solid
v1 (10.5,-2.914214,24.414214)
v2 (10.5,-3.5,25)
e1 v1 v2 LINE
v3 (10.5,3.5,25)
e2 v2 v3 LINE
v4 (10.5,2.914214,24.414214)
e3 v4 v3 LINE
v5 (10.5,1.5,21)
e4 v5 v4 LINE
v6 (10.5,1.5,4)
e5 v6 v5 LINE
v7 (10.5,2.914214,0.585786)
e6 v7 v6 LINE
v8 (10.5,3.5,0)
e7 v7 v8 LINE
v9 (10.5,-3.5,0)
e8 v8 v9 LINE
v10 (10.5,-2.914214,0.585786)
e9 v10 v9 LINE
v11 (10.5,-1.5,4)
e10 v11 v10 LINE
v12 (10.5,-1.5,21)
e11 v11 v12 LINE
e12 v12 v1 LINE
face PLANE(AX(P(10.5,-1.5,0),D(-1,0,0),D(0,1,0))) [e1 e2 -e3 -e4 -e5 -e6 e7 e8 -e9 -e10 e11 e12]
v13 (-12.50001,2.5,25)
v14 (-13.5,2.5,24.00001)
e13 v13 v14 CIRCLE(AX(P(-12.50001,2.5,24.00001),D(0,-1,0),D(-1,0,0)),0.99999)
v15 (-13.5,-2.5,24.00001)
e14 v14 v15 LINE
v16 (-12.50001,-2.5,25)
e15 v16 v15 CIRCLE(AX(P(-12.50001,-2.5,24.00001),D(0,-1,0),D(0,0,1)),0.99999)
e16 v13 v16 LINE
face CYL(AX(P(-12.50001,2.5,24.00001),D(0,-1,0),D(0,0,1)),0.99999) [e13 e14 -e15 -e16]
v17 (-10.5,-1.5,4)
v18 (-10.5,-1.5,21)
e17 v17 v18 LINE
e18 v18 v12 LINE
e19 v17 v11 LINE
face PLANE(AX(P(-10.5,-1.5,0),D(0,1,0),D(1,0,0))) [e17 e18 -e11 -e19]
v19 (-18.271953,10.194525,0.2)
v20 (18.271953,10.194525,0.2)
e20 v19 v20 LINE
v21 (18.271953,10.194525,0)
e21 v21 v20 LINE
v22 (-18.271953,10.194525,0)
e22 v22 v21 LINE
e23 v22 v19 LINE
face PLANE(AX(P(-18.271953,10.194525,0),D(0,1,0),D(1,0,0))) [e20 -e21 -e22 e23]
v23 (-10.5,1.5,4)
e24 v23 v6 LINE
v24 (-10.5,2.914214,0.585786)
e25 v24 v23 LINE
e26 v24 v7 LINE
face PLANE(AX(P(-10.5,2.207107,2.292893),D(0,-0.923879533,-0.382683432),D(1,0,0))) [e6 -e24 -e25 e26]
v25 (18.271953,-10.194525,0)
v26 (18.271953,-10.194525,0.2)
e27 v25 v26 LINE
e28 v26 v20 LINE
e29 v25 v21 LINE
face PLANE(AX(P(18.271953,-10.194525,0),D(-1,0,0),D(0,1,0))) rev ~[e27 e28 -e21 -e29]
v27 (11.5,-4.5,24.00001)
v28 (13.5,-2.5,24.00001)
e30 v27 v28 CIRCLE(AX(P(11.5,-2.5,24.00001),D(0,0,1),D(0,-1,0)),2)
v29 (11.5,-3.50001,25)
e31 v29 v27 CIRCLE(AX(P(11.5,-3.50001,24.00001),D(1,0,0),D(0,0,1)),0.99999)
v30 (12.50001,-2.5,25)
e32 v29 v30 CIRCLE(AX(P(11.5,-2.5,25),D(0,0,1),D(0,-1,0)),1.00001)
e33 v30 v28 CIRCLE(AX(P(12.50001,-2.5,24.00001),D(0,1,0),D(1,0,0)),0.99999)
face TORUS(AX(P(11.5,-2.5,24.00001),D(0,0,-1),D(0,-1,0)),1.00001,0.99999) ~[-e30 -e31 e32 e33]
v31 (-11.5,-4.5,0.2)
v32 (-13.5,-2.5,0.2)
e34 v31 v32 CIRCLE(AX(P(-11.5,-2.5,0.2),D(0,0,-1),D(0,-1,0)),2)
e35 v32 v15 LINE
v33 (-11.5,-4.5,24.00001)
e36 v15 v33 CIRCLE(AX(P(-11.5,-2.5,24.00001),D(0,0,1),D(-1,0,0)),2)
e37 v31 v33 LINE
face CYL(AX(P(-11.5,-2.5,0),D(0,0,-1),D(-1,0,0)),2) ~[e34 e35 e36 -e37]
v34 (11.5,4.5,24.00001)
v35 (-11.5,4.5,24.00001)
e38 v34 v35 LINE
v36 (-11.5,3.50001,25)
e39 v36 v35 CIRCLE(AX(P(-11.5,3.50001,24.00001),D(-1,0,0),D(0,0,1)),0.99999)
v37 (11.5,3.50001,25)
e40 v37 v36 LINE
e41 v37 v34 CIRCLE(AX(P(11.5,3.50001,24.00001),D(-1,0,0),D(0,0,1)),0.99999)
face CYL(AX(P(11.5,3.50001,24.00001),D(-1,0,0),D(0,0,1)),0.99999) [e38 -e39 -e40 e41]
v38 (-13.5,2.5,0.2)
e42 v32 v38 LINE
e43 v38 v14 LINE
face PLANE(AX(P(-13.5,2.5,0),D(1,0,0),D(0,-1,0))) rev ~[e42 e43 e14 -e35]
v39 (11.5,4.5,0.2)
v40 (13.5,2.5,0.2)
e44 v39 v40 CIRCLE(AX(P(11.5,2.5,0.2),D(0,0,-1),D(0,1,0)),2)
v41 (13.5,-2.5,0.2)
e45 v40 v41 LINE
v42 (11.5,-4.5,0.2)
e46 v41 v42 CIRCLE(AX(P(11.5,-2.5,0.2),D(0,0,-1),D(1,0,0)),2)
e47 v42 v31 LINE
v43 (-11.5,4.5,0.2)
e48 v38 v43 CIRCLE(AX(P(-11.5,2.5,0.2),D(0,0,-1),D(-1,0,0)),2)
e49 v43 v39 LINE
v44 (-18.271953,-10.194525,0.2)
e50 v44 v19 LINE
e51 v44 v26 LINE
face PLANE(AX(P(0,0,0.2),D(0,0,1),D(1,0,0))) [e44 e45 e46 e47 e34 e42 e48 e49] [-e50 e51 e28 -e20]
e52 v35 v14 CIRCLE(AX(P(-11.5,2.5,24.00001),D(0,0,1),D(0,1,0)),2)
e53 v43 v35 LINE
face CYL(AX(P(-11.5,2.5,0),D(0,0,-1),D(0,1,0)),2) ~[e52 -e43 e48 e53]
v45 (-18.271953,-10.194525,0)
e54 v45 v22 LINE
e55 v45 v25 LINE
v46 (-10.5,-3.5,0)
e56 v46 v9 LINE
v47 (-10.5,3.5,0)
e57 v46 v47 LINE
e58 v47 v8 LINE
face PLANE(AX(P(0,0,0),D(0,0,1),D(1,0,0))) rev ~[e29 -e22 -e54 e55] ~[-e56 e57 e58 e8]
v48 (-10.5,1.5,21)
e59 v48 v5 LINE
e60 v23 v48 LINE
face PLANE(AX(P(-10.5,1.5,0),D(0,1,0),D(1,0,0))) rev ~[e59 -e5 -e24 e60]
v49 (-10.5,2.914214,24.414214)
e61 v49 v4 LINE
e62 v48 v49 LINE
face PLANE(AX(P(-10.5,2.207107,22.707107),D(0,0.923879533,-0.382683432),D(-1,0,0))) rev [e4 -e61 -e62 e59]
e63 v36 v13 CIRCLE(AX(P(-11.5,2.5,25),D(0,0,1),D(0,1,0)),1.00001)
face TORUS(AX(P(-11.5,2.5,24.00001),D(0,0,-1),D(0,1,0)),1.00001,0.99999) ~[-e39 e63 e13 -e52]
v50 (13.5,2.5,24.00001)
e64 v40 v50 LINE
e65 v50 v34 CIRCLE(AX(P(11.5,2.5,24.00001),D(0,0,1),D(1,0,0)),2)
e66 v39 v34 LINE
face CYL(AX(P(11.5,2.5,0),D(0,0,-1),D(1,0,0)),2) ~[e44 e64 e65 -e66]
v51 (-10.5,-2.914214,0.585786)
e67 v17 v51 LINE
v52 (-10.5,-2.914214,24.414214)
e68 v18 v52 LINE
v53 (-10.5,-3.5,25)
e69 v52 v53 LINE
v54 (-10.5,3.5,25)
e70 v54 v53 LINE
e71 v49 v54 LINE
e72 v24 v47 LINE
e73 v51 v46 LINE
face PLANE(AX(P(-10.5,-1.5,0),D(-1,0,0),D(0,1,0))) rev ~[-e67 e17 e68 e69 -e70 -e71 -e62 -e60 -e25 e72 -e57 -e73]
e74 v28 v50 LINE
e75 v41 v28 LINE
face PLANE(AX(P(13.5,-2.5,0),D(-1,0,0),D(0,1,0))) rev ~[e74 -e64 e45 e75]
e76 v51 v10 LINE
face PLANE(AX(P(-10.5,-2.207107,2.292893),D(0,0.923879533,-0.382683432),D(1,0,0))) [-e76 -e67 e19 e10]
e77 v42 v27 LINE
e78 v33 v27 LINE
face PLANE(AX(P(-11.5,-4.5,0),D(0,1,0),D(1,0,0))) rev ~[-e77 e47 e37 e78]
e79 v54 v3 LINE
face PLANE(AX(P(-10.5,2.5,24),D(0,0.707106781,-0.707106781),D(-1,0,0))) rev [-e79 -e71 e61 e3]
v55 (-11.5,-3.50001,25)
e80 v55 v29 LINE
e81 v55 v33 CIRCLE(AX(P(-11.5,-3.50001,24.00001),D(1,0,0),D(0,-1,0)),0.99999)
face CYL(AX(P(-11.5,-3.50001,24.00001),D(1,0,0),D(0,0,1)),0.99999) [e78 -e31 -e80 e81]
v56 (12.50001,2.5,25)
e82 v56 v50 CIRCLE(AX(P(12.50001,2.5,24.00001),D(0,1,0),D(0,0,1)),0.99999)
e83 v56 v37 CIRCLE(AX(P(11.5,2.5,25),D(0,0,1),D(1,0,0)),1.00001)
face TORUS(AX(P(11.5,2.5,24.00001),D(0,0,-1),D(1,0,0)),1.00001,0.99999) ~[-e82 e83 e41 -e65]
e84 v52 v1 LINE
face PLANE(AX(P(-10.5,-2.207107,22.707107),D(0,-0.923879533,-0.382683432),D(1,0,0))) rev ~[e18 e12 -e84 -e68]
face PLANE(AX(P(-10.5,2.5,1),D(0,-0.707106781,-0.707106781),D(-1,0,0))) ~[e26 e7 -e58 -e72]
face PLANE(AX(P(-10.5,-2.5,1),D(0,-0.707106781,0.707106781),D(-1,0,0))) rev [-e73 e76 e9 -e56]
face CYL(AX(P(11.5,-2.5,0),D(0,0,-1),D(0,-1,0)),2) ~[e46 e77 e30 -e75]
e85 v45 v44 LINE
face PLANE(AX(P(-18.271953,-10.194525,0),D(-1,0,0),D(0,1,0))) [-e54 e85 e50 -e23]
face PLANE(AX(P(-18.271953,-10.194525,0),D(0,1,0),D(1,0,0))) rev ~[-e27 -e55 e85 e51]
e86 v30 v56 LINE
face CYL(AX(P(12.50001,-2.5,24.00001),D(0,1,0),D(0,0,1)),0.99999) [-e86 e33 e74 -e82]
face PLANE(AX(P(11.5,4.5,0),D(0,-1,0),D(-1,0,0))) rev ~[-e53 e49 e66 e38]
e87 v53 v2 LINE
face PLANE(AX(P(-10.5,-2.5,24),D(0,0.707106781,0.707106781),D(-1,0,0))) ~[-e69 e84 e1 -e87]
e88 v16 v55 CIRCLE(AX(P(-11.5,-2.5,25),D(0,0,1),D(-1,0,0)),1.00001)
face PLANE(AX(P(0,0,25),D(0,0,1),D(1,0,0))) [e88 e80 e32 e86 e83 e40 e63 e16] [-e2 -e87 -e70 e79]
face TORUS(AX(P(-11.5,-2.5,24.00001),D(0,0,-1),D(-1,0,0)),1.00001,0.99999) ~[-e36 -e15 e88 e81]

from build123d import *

# Parameters (mm, degrees)
F0_W     = 21
F0_H     = 3
F1_DEPTH = 25
F2_SIZE  = 2
F3_SIZE  = 2
F4_R     = 0.99999
F0_W_2   = 36.543905735
F0_H_2   = 20.3890502453
F5_DEPTH = 0.2


# Not quite as in the source:
# - a fillet or chamfer is up to 0.001 mm smaller than in the source, because OpenCascade refuses the exact size


with BuildPart() as f1:
    # F0 (on Top) → F1 (new body)
    with BuildSketch(Plane.XY):
        with BuildLine():
            Line((-11.5, -4.5), (11.5, -4.5))
            ThreePointArc((11.5, -4.5), (12.9142135624, -3.9142135624), (13.5, -2.5))
            Line((13.5, -2.5), (13.5, 2.5))
            ThreePointArc((13.5, 2.5), (12.9142135624, 3.9142135624), (11.5, 4.5))
            Line((11.5, 4.5), (-11.5, 4.5))
            ThreePointArc((-11.5, 4.5), (-12.9142135624, 3.9142135624), (-13.5, 2.5))
            Line((-13.5, 2.5), (-13.5, -2.5))
            ThreePointArc((-13.5, -2.5), (-12.9142135624, -3.9142135624), (-11.5, -4.5))
        make_face()
        Rectangle(F0_W, F0_H, mode=Mode.SUBTRACT)
    extrude(amount=F1_DEPTH)

    # F2
    f2_edges = [f1.edges().sort_by_distance(p)[0] for p in [
        (0, -1.5, 25),
        (0, 1.5, 25),
        (0, 1.5, 0),
        (0, -1.5, 0),
    ]]
    chamfer(f2_edges, length=F2_SIZE)

    # F3
    f3_edges = [f1.edges().sort_by_distance(p)[0] for p in [
        (0, 1.5, 23),
        (0, -1.5, 23),
        (0, -1.5, 2),
        (0, 1.5, 2),
    ]]
    chamfer(f3_edges, length=F3_SIZE)

    # F4 (radius 1 in the source; OpenCascade refuses exactly that, so slightly less here)
    f4_edges = [f1.edges().sort_by_distance(p)[0] for p in [
        (0, 4.5, 25),
    ]]
    fillet(f4_edges, radius=F4_R)

    # F0 (on Top) → F5 (join)
    with BuildSketch(Plane.XY):
        Rectangle(F0_W_2, F0_H_2)
        with BuildLine():
            ThreePointArc((13.5, -2.5), (12.9142135624, -3.9142135624), (11.5, -4.5))
            Line((11.5, -4.5), (-11.5, -4.5))
            ThreePointArc((-11.5, -4.5), (-12.9142135624, -3.9142135624), (-13.5, -2.5))
            Line((-13.5, -2.5), (-13.5, 2.5))
            ThreePointArc((-13.5, 2.5), (-12.9142135624, 3.9142135624), (-11.5, 4.5))
            Line((-11.5, 4.5), (11.5, 4.5))
            ThreePointArc((11.5, 4.5), (12.9142135624, 3.9142135624), (13.5, 2.5))
            Line((13.5, 2.5), (13.5, -2.5))
        make_face(mode=Mode.SUBTRACT)
    extrude(amount=F5_DEPTH)


solid = f1.part
